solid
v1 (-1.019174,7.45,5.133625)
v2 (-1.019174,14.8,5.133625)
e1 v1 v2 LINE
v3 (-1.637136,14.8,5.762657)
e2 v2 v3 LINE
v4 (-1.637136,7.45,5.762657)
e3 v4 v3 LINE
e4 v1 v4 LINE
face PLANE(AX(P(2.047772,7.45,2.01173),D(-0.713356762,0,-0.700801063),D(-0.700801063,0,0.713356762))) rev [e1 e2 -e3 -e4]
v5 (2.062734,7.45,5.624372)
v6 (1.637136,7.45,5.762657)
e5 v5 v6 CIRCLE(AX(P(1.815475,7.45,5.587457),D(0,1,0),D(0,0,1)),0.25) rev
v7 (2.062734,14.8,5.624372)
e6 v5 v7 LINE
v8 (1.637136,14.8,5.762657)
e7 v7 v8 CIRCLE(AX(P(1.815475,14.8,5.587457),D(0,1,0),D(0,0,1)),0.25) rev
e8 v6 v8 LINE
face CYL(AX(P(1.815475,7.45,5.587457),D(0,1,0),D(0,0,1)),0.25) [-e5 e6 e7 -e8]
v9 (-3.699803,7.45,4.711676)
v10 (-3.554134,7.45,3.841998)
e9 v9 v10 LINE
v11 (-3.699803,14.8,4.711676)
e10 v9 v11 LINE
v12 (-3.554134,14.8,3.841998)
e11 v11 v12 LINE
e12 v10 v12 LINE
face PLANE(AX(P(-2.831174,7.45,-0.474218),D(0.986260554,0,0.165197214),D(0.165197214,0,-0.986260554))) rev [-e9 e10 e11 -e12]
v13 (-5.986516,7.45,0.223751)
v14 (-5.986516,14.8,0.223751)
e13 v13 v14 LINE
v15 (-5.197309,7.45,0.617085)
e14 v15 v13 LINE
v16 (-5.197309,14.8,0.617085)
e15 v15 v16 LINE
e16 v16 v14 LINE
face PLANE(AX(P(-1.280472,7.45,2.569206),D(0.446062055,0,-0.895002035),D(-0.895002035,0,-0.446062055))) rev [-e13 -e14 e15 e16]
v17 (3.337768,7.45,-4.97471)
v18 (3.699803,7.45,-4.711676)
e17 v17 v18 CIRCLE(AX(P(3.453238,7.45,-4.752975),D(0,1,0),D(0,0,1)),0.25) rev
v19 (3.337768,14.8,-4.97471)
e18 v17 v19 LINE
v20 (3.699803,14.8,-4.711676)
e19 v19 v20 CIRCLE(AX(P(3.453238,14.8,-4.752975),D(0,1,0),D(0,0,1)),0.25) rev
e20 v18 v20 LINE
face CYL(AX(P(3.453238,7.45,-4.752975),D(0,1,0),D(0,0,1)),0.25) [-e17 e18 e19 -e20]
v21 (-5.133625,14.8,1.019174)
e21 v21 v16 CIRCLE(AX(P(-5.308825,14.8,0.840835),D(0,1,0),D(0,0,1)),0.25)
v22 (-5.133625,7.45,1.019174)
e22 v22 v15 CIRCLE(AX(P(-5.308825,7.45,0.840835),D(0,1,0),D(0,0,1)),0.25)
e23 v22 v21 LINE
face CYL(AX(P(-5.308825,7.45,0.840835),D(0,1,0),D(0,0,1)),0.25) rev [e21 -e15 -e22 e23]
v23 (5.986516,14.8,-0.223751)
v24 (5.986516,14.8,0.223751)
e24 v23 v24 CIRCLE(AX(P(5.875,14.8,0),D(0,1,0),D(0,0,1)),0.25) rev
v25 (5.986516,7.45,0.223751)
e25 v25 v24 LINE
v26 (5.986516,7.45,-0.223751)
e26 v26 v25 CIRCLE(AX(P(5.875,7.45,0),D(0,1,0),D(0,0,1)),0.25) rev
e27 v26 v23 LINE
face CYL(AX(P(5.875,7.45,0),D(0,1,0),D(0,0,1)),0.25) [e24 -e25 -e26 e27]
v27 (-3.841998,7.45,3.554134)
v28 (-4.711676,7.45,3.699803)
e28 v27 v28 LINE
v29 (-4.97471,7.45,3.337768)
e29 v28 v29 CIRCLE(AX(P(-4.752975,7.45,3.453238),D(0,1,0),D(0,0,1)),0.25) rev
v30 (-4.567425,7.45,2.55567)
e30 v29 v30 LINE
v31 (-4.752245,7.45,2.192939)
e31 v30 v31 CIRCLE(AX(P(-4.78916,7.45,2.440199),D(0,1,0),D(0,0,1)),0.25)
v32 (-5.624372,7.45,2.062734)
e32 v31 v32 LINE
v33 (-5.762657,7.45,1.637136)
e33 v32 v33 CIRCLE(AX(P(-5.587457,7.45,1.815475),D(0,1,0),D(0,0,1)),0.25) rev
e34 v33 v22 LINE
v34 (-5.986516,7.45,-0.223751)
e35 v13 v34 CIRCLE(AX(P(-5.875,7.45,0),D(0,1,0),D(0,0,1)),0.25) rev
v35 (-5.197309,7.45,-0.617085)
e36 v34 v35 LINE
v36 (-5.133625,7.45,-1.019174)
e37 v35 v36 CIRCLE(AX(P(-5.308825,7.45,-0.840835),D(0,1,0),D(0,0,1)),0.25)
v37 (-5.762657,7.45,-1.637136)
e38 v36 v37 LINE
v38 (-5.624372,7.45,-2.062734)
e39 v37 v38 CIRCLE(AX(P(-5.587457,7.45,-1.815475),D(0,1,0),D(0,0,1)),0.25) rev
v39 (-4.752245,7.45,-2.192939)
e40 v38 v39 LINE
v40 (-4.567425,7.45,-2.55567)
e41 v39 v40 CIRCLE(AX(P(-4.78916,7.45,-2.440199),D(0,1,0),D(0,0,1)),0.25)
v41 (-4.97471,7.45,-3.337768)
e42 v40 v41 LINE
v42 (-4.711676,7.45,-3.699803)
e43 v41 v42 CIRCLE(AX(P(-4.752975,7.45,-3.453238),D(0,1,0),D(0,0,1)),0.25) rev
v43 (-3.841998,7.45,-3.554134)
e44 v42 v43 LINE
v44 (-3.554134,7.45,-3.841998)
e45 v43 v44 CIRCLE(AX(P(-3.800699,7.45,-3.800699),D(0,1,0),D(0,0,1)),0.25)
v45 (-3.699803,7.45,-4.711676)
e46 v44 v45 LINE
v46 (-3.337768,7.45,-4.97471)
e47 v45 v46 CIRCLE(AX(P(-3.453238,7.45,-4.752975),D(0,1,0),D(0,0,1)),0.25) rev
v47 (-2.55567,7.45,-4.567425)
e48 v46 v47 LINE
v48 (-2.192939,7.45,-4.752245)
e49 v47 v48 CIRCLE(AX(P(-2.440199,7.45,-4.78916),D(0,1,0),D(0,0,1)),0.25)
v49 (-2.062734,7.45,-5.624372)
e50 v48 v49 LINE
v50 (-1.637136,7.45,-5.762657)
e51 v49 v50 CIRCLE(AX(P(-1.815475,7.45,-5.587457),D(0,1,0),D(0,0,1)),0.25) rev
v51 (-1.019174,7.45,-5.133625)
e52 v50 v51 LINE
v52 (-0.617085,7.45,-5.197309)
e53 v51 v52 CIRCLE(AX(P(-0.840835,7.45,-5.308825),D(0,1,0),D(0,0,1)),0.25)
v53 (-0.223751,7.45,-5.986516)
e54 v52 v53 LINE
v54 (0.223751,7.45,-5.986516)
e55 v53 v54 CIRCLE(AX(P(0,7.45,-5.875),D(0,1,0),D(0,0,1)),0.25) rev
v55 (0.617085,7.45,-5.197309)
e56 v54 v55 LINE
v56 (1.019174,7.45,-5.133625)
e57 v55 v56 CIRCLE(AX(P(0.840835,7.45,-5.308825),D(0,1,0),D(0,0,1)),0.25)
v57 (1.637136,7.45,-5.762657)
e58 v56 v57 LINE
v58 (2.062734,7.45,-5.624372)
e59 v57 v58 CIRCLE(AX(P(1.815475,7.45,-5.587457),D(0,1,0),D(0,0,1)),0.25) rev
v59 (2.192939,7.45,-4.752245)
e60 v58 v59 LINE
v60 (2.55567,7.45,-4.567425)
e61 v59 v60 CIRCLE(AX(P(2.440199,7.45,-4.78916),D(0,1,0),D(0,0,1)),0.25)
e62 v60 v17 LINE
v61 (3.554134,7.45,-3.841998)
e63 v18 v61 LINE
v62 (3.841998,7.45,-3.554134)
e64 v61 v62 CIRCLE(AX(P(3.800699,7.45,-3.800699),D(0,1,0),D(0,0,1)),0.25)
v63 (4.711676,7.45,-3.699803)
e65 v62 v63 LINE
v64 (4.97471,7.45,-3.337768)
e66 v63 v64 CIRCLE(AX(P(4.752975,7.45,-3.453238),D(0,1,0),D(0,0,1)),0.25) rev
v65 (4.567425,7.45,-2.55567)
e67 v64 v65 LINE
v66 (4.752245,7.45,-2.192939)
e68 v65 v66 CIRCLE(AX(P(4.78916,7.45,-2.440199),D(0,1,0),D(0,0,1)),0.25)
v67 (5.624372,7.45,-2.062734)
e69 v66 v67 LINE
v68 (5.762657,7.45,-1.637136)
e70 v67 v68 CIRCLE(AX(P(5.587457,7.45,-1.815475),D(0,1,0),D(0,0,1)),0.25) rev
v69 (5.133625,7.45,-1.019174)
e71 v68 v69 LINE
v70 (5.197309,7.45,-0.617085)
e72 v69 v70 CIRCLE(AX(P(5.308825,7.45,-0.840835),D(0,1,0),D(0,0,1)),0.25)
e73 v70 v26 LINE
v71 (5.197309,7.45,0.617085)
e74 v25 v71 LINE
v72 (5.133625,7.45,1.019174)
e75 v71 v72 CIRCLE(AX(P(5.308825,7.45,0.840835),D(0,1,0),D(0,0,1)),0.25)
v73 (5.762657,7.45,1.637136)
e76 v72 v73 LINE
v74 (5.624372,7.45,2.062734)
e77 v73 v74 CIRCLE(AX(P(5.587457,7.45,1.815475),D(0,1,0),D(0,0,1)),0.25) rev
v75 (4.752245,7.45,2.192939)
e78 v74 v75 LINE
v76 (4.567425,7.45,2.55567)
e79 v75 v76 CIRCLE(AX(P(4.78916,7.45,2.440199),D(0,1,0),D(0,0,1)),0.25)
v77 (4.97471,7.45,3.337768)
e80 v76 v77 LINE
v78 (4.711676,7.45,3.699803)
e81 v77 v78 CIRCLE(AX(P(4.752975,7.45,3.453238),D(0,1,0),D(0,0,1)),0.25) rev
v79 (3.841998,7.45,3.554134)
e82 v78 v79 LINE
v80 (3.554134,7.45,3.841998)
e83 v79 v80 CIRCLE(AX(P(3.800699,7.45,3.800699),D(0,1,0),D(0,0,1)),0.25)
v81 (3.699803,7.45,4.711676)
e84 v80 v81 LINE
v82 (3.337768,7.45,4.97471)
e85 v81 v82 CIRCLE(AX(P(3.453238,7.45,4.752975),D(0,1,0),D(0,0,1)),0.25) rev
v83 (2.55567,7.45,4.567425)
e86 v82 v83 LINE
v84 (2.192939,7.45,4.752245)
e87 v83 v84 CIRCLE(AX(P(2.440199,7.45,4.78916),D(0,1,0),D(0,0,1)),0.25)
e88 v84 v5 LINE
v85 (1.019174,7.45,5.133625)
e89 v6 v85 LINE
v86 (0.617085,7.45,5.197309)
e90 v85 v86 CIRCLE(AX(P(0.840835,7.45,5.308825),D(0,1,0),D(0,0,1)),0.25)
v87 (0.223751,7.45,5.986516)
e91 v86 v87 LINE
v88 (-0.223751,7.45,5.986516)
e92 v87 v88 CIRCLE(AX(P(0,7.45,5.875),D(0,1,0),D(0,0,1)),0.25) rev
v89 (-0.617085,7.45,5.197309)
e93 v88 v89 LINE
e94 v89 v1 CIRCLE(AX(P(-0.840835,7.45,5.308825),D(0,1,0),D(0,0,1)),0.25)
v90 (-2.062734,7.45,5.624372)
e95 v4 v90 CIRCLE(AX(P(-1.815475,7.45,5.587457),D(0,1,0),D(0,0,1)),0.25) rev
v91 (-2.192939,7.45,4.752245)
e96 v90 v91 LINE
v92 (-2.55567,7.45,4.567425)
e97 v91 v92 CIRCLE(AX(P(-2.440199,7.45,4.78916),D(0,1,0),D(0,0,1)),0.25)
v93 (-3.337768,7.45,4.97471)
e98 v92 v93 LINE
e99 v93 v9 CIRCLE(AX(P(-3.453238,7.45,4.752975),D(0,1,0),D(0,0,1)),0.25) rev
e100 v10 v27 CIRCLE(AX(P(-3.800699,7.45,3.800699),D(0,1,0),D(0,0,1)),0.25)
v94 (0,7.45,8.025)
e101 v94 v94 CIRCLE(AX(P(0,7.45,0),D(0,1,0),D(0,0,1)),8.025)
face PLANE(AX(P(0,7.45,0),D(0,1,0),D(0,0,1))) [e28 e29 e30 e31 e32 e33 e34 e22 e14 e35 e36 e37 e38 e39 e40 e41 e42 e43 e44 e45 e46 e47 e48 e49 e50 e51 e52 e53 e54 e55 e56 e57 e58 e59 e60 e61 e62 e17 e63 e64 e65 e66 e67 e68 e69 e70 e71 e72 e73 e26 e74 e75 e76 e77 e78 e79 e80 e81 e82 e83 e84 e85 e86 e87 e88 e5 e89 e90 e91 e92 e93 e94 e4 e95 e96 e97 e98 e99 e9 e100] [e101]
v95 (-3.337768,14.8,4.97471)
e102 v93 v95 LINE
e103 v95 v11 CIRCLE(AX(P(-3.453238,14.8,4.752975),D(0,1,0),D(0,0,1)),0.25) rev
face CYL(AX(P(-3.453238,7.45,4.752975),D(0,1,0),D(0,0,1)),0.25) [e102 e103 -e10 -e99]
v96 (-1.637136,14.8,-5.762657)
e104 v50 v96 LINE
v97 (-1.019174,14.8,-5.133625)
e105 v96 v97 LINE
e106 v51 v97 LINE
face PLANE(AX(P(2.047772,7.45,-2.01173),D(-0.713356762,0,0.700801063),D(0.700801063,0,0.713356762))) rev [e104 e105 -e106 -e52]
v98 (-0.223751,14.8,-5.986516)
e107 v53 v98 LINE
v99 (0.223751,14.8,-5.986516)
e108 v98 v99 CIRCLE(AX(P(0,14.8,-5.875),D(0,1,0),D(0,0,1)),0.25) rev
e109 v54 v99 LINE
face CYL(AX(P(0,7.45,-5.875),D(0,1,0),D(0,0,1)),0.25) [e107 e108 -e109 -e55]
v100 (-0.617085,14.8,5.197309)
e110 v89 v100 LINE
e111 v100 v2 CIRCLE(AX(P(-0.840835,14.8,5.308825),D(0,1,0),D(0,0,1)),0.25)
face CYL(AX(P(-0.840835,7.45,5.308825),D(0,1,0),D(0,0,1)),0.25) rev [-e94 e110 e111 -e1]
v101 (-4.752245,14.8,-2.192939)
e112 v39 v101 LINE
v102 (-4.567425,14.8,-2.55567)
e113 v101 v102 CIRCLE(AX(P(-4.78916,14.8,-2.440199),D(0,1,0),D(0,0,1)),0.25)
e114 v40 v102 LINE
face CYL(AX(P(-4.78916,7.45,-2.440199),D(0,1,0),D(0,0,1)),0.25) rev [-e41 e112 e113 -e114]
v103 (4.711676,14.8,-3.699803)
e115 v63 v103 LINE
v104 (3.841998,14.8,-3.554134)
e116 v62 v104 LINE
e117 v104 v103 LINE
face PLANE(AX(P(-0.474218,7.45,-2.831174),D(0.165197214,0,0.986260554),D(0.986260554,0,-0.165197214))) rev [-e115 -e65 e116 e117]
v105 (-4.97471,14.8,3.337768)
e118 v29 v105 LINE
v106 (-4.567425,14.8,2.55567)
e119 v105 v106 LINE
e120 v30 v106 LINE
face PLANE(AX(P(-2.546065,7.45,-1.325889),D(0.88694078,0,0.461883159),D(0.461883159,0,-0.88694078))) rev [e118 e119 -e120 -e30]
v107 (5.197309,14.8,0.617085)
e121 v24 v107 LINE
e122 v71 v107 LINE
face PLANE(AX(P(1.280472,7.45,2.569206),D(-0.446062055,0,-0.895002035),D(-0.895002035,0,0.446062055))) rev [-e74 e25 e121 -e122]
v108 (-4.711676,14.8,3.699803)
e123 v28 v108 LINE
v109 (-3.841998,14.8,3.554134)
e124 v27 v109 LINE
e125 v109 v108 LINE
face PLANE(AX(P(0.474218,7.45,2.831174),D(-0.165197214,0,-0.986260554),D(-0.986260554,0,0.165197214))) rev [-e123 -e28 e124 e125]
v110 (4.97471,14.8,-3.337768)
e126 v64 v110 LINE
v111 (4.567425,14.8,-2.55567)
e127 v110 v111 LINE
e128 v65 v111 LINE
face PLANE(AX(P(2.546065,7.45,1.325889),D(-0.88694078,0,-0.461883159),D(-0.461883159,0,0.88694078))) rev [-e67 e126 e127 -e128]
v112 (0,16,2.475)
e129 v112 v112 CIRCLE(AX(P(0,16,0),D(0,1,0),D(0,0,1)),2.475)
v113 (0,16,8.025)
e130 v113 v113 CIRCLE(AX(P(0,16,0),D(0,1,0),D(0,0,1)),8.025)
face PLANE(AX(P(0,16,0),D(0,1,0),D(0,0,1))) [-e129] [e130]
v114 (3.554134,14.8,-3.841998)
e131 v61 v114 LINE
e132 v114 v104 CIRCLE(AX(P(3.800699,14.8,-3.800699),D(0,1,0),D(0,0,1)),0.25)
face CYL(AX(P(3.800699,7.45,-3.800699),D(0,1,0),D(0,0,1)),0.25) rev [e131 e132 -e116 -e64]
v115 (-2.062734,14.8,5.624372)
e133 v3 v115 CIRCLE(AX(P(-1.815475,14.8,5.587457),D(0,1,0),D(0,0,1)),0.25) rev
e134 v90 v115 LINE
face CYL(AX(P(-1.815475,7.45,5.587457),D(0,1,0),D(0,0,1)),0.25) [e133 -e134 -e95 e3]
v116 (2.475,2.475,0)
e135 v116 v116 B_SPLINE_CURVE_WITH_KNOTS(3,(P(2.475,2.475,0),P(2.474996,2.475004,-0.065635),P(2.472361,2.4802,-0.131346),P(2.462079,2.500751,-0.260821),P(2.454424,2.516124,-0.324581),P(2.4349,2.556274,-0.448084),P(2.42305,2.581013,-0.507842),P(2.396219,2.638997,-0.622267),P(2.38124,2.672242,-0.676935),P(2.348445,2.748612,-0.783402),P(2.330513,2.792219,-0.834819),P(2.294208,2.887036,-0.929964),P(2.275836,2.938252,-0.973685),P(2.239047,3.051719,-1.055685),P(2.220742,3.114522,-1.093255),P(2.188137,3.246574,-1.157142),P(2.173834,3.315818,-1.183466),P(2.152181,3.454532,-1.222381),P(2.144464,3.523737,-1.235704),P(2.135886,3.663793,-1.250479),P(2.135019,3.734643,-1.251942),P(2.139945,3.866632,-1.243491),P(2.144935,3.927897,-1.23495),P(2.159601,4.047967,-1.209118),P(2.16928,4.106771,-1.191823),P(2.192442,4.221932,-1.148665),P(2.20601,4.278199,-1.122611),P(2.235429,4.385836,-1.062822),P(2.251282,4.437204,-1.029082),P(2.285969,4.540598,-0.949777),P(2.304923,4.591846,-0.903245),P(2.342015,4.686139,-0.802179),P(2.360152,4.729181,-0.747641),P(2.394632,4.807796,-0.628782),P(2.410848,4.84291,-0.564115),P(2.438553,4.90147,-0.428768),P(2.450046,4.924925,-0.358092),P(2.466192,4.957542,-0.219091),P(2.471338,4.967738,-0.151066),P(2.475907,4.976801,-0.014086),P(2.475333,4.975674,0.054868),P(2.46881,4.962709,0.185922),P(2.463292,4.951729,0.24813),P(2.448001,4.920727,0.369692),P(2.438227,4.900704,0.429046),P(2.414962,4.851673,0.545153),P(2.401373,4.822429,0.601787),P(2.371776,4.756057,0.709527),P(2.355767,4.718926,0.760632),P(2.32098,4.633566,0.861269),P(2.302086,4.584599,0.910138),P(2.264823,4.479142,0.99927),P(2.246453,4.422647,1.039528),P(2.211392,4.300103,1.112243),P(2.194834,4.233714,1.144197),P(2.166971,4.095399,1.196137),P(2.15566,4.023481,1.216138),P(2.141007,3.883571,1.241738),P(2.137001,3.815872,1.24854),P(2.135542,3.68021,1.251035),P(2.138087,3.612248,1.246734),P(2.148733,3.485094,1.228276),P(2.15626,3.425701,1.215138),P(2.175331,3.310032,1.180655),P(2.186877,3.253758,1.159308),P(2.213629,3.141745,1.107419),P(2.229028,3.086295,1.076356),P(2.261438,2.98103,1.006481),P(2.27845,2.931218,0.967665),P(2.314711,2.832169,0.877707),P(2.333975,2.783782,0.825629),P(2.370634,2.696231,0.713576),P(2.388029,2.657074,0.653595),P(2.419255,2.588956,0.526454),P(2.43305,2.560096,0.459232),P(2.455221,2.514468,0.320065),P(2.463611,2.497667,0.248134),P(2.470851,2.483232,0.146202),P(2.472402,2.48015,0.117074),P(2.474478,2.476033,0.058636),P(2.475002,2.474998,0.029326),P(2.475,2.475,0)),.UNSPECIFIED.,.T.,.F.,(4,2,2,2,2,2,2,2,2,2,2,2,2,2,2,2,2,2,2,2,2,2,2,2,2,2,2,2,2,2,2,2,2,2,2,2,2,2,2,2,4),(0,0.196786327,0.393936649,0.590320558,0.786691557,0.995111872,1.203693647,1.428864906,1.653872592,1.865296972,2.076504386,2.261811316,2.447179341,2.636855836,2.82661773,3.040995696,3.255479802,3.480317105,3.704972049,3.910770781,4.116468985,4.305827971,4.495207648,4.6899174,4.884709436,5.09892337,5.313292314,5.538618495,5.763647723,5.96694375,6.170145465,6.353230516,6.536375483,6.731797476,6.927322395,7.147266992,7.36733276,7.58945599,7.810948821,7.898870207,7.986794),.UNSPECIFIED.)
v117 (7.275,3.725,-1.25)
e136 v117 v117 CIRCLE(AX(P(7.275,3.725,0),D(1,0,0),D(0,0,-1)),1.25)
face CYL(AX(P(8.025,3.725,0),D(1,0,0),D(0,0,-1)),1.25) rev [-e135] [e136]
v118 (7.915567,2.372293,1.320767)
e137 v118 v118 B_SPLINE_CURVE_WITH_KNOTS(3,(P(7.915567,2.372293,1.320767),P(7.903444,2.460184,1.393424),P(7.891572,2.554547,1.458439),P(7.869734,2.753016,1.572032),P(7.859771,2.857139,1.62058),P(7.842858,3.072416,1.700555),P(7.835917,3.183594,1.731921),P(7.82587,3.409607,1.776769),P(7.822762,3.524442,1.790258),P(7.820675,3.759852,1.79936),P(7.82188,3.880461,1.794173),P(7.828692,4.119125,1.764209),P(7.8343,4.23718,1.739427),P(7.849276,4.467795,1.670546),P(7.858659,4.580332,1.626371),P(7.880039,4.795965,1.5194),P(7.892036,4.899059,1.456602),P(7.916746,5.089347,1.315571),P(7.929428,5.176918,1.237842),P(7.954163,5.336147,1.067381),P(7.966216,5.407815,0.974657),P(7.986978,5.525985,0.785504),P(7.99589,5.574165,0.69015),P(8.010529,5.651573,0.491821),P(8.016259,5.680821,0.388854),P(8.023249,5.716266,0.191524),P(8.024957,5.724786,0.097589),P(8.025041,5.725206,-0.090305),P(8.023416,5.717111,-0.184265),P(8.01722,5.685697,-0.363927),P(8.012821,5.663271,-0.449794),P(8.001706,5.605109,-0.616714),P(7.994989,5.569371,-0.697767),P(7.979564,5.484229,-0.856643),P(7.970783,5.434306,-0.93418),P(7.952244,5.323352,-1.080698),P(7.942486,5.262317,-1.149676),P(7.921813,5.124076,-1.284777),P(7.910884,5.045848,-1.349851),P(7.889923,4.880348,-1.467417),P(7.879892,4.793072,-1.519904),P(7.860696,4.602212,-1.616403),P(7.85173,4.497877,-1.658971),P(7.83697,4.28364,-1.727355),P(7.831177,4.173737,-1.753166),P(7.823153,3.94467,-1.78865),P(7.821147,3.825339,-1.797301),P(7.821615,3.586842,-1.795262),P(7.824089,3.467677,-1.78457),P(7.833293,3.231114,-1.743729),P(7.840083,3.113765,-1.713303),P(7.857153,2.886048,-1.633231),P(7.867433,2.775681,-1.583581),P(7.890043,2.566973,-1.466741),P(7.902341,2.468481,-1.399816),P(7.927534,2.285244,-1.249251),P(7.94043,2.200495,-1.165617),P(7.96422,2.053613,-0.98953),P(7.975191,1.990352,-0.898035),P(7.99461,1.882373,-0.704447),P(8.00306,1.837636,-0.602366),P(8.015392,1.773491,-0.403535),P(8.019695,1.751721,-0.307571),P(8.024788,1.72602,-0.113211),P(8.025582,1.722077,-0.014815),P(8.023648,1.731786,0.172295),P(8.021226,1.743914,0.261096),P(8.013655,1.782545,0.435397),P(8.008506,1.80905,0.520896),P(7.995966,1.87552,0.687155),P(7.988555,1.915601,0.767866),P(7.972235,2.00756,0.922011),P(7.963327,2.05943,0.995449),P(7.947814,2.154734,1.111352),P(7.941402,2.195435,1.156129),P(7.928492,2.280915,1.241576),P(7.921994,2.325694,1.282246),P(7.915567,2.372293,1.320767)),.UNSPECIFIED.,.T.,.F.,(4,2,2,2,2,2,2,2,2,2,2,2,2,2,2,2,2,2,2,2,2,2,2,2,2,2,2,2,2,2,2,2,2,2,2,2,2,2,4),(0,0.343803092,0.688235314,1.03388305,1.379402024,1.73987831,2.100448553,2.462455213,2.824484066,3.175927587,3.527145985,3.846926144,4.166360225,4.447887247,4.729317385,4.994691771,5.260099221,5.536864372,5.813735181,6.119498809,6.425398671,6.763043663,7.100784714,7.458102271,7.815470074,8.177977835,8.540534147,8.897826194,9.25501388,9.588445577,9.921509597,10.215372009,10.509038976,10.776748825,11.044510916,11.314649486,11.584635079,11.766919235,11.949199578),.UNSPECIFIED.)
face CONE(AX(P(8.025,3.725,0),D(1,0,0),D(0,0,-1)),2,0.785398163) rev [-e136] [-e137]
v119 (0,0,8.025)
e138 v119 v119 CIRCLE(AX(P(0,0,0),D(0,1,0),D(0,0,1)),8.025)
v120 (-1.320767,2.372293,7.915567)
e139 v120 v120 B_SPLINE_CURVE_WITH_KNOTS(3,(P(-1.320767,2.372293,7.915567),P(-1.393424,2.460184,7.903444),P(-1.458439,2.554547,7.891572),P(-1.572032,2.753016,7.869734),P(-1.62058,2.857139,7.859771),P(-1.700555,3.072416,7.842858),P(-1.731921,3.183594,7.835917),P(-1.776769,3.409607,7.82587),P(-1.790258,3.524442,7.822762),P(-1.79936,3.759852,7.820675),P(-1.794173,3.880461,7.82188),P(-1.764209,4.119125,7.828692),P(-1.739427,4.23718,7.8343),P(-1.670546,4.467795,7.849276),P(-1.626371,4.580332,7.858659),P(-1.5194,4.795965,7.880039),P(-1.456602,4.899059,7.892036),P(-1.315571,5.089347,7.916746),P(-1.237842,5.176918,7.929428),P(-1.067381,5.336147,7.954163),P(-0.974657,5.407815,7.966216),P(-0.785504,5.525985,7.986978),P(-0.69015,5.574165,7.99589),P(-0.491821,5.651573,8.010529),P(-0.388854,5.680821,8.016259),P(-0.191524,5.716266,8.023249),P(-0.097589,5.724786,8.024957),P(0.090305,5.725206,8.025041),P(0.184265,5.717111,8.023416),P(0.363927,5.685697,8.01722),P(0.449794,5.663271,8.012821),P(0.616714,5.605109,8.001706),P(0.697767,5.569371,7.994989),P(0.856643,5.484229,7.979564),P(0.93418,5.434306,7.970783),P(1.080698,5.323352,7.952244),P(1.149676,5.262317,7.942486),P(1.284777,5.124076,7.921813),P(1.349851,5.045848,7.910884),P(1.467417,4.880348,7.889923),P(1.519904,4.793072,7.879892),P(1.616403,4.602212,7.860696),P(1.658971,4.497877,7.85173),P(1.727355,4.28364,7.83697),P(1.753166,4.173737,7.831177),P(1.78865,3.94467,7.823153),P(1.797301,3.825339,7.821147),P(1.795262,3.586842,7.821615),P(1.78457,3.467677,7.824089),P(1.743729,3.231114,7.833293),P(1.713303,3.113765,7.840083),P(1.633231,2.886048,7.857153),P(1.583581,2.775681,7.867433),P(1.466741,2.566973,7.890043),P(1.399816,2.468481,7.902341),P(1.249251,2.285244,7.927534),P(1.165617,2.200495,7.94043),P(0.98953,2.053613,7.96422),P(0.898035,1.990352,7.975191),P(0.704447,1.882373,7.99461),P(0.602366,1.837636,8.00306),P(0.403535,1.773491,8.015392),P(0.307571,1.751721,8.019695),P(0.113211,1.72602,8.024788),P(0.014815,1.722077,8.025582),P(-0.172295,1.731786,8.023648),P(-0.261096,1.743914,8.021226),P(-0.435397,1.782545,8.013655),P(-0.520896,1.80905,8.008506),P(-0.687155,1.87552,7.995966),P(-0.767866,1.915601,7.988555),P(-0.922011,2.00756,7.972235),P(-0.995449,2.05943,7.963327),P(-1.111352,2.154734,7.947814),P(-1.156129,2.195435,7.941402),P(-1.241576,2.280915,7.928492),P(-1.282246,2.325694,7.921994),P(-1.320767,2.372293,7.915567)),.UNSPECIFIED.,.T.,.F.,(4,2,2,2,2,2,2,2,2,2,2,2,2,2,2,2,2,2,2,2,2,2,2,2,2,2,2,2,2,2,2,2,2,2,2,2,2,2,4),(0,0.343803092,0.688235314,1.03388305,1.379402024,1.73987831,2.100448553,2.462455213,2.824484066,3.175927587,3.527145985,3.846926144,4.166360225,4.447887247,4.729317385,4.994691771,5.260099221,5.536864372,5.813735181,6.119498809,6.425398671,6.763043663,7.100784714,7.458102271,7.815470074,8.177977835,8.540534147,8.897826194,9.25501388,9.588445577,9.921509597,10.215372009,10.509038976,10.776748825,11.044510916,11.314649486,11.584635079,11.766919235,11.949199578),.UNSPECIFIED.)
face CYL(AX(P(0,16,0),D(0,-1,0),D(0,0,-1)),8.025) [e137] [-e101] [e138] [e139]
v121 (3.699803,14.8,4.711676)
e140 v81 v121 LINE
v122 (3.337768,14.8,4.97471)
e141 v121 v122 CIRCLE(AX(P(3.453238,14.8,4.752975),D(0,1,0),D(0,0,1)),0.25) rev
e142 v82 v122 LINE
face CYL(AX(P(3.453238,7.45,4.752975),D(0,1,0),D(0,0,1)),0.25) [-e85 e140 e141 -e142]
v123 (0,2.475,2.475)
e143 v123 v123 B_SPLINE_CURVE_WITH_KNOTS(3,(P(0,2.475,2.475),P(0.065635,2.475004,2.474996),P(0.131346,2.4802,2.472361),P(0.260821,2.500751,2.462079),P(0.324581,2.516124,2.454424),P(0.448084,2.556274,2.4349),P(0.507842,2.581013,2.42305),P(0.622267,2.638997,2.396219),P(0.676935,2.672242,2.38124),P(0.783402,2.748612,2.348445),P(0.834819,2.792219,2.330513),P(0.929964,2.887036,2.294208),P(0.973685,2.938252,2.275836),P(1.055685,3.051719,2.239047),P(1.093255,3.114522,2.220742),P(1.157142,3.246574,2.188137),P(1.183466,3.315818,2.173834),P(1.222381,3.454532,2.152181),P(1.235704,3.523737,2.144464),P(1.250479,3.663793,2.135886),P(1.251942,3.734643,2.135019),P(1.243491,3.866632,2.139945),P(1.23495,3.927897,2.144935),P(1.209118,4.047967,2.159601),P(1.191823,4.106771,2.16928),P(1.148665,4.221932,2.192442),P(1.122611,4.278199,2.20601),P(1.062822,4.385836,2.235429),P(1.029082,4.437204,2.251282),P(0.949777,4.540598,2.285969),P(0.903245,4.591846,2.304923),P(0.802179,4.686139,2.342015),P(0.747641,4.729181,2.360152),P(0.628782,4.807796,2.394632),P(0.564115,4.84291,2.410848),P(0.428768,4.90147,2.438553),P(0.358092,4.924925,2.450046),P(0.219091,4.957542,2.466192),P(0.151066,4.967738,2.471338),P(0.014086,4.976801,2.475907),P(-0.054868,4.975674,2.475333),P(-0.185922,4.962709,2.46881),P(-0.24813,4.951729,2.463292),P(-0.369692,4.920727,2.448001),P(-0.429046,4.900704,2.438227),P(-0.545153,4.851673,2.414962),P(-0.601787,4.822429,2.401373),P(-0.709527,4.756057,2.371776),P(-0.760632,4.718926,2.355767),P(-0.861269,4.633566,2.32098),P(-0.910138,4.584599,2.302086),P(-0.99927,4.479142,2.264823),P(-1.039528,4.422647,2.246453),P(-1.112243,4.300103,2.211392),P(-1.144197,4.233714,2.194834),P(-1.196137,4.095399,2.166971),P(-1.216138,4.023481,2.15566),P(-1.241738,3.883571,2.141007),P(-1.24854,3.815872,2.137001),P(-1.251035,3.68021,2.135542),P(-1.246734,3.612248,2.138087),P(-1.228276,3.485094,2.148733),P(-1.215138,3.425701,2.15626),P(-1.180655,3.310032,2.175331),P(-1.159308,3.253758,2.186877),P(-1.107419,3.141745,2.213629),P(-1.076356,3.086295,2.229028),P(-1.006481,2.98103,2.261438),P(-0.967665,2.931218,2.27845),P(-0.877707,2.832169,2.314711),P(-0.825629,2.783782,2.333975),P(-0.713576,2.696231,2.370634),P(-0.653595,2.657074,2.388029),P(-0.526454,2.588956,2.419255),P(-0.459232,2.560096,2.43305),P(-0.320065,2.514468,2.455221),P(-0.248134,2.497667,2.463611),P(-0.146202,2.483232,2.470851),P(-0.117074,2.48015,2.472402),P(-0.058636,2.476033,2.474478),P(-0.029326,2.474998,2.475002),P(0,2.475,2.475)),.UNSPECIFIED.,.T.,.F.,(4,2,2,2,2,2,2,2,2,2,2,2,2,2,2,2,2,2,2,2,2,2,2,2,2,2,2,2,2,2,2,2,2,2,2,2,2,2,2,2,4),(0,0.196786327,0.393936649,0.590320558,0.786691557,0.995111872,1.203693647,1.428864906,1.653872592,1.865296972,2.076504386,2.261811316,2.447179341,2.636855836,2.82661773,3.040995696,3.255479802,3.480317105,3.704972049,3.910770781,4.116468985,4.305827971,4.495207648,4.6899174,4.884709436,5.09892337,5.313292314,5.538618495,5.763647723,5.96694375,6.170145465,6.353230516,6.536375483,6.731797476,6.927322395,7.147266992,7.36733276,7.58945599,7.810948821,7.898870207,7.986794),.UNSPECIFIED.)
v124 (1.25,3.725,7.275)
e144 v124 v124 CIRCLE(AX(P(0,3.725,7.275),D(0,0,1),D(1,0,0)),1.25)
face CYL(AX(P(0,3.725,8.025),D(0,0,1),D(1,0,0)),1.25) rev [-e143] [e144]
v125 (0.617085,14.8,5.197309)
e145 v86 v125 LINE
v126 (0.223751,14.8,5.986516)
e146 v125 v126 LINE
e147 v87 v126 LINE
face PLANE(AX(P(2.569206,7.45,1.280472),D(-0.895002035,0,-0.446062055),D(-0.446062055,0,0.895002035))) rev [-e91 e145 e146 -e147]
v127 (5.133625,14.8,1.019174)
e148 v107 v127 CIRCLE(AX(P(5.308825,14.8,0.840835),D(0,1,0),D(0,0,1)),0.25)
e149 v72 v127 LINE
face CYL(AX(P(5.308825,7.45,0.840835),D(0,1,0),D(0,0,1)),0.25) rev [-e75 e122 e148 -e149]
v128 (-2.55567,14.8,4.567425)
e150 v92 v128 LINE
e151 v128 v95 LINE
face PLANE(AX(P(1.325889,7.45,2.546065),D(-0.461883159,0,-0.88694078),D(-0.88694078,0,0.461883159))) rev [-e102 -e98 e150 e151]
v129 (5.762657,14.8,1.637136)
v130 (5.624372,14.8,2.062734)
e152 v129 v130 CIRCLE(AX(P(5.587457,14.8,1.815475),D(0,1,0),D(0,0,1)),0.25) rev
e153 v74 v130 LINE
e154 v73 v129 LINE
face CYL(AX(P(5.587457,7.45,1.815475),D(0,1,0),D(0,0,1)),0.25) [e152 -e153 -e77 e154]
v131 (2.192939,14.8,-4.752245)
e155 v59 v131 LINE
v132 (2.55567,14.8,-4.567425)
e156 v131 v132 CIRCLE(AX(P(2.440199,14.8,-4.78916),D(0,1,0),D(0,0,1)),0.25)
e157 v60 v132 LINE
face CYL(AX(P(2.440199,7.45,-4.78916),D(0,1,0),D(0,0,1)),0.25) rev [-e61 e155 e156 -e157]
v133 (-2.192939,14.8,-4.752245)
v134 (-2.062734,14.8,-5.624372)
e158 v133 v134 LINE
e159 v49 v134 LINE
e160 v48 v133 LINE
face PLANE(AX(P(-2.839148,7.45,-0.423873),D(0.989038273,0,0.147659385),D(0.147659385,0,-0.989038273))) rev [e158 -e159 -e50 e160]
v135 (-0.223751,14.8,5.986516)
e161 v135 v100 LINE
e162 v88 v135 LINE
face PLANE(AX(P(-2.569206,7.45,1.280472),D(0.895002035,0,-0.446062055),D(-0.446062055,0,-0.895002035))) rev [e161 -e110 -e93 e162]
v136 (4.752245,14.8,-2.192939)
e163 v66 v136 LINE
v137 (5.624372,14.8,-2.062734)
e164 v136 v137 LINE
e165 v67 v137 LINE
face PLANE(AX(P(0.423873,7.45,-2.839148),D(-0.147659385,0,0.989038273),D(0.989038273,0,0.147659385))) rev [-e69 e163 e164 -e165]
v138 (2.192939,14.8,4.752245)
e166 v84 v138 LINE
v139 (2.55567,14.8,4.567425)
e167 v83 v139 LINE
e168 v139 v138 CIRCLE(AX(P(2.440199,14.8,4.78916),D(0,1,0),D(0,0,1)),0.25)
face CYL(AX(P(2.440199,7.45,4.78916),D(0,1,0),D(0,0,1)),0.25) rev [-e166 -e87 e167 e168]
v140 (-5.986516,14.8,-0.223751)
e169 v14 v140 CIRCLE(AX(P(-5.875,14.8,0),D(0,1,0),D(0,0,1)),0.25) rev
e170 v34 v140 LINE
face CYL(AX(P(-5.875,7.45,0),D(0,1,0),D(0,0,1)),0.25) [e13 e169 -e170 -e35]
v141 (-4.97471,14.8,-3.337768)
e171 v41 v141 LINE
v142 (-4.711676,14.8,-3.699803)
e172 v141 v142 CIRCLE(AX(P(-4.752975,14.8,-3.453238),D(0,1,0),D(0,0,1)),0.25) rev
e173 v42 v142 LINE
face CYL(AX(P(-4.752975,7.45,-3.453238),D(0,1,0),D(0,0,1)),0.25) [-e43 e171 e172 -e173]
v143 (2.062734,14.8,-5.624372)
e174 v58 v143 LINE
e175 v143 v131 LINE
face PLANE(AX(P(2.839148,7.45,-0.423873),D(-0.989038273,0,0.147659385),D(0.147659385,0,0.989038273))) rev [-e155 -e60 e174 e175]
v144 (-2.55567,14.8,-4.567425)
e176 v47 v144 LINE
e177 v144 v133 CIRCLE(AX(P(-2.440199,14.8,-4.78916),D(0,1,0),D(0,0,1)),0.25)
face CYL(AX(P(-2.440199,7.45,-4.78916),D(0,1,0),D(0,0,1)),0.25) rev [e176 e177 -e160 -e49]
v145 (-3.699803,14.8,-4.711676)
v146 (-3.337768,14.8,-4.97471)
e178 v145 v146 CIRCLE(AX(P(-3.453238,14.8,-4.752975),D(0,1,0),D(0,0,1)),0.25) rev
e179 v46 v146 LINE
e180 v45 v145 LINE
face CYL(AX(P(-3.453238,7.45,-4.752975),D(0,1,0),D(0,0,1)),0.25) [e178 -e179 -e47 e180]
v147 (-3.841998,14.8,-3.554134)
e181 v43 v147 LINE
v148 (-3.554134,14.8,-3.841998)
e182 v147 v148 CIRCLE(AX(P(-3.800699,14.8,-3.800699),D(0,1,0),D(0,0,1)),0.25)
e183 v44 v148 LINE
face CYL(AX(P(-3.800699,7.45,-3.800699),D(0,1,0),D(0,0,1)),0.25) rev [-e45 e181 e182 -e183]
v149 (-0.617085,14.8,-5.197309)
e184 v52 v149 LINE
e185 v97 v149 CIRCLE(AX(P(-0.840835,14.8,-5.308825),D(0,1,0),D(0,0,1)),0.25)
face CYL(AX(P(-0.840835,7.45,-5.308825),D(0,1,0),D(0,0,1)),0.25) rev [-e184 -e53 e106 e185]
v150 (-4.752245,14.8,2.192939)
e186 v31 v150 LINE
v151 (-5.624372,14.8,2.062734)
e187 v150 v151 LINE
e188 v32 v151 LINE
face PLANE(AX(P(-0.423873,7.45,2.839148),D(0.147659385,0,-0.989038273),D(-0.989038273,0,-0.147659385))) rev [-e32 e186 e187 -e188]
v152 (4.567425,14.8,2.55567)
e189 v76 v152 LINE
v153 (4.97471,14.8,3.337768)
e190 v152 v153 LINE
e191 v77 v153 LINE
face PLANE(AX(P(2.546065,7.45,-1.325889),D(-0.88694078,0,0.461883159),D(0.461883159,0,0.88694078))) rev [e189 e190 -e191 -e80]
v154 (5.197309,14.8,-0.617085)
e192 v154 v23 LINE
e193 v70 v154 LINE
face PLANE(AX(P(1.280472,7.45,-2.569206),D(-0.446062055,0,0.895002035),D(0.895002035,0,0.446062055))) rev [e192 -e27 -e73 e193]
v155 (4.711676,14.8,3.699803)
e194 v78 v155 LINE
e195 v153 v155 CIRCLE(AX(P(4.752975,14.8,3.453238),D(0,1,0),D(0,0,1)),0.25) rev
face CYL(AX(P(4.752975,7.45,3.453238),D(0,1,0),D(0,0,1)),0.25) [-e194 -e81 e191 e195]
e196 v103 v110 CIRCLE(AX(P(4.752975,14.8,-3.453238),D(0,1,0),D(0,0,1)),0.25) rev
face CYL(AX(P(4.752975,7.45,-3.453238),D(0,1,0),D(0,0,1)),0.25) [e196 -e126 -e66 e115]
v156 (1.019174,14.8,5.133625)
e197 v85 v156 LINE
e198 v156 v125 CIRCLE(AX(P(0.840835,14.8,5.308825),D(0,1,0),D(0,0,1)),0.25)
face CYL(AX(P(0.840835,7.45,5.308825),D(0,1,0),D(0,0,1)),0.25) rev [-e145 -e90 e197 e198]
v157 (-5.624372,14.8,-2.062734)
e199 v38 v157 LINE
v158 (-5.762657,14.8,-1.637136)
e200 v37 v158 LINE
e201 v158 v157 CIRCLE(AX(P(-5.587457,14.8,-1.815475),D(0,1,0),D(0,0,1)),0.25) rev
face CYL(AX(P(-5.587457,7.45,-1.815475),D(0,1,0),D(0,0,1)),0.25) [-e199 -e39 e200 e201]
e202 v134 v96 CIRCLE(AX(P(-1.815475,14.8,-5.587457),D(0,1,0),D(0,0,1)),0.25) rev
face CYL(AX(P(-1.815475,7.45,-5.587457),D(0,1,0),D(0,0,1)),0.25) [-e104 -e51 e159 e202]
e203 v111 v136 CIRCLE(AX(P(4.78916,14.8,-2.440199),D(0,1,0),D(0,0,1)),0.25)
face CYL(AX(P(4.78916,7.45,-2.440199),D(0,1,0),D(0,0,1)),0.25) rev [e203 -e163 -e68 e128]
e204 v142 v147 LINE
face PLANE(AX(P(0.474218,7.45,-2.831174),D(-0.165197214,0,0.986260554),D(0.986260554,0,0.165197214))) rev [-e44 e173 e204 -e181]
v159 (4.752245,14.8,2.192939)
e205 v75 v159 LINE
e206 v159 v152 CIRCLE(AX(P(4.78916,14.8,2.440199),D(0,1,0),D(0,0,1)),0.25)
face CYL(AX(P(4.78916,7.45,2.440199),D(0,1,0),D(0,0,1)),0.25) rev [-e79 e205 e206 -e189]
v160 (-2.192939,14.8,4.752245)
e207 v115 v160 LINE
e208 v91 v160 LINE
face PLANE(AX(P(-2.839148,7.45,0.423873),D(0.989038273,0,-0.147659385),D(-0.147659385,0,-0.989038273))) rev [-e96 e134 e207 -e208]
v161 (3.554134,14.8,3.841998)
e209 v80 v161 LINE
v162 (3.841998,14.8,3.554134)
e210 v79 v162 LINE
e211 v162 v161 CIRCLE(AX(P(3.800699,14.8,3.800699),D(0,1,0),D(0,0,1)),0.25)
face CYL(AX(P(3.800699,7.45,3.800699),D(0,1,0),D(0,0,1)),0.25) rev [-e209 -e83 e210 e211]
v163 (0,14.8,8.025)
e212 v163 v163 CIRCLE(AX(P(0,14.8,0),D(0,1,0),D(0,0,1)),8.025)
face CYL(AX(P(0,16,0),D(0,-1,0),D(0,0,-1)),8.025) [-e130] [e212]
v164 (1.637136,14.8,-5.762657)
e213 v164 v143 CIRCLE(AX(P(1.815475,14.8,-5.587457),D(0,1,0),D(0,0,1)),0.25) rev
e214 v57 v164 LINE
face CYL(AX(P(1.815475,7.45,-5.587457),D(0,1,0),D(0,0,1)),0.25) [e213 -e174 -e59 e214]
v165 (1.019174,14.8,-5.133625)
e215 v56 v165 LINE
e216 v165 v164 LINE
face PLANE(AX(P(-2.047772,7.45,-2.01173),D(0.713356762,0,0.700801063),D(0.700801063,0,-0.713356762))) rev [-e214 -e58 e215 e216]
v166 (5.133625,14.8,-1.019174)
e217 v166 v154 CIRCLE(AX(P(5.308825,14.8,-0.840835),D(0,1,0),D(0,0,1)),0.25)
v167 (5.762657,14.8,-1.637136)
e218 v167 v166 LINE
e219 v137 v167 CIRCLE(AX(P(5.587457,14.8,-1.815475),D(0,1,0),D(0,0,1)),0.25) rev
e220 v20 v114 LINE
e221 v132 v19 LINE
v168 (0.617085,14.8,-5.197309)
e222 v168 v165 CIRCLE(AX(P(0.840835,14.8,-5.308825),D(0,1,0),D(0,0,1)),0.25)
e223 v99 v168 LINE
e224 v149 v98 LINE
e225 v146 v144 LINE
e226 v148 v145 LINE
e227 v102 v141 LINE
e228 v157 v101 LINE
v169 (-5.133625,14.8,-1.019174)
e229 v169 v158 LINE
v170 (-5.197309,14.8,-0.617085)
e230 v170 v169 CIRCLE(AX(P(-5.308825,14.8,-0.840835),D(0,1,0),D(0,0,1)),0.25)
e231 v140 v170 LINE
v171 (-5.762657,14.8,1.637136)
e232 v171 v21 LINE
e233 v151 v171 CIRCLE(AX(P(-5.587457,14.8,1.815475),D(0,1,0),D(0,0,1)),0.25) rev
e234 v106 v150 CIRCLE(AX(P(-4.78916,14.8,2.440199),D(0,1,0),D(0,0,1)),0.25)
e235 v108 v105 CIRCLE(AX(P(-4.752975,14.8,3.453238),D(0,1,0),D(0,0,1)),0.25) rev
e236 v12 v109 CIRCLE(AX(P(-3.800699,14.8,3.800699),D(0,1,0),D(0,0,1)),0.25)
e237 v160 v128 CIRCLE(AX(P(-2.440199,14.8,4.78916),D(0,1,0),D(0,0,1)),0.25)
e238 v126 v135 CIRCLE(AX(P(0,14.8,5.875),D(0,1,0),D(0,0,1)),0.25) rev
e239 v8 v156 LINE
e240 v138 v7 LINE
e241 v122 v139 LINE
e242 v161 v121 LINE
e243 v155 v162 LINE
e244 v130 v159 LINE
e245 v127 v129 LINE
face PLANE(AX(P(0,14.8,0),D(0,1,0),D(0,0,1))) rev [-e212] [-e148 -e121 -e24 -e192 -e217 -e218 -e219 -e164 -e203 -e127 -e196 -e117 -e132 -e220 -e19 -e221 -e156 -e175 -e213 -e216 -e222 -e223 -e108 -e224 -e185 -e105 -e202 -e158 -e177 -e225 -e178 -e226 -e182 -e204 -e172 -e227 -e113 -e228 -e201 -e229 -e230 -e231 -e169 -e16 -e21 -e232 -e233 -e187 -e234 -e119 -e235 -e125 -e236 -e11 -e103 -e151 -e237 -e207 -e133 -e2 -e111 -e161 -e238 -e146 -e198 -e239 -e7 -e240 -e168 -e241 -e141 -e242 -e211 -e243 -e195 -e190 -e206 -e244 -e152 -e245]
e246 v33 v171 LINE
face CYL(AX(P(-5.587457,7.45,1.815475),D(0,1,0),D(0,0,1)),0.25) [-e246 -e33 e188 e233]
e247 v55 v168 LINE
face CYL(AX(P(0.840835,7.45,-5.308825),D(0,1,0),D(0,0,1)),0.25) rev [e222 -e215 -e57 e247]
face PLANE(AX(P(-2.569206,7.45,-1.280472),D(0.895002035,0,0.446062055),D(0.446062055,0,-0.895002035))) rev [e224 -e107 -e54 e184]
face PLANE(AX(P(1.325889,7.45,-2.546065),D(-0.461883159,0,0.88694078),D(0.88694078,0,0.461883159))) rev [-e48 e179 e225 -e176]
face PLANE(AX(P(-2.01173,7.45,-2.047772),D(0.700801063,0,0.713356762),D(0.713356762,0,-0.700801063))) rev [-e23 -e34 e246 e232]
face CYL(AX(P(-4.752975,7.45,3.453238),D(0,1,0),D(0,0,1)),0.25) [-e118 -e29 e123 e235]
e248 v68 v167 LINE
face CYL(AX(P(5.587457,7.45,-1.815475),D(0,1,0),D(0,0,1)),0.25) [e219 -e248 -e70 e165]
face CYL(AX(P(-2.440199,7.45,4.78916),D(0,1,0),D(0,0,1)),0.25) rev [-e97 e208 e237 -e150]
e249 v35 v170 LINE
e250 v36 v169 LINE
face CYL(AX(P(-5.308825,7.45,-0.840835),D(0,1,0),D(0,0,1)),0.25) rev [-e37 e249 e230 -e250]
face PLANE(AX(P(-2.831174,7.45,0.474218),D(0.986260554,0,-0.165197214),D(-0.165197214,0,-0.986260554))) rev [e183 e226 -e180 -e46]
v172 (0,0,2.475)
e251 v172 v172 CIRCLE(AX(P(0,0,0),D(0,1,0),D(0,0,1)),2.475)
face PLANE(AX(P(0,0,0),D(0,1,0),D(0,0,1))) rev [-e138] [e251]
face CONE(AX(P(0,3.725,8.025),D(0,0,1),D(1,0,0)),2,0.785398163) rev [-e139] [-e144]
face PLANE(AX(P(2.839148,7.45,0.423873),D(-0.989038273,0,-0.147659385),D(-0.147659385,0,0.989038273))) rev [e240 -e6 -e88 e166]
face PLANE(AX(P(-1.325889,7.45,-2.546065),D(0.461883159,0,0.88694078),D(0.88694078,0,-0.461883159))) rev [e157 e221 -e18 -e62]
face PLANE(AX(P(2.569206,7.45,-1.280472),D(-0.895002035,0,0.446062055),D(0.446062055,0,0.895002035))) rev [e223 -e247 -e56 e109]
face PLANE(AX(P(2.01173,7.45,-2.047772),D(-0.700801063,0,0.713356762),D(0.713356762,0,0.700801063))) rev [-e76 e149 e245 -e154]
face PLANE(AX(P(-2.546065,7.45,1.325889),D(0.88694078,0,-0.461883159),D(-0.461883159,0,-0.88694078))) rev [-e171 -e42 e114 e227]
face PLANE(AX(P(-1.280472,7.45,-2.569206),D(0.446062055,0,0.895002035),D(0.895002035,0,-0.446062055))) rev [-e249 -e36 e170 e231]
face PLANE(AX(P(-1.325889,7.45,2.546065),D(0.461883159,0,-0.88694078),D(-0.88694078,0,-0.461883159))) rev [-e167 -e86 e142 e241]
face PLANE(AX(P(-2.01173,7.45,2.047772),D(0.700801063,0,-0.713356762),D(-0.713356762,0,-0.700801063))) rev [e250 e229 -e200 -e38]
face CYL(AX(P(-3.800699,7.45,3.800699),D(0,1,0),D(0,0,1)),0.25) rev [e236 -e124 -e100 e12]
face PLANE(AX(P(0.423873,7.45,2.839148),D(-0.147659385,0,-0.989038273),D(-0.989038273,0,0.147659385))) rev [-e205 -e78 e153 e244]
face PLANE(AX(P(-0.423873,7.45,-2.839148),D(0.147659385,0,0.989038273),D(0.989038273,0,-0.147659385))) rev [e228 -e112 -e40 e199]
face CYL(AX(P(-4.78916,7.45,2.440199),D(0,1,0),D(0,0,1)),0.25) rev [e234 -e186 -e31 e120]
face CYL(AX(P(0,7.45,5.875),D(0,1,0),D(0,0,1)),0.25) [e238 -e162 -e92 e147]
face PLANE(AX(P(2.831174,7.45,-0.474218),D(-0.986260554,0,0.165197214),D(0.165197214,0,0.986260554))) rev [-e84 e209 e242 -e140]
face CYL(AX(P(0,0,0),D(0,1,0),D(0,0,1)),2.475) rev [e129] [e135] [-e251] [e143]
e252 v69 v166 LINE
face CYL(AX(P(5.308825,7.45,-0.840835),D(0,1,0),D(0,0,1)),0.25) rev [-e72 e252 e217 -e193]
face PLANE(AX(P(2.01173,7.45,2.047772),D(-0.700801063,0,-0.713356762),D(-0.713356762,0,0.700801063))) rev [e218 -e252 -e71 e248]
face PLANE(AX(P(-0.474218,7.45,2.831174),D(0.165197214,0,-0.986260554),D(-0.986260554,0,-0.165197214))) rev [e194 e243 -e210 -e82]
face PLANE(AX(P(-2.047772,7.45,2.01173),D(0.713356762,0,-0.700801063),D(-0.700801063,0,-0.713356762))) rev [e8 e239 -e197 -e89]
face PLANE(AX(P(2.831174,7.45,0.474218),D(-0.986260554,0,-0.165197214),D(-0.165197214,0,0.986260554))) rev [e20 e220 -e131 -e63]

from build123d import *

# Parameters (mm, degrees)
SKETCH1_R           = 8.025
BOSS_EXTRUDE1_DEPTH = 16
CUT_EXTRUDE1_START  = -8.55
SKETCH2_R           = 8.025
CUT_EXTRUDE1_DEPTH  = 7.35
SKETCH3_R           = 2.475
CUT_EXTRUDE2_DEPTH  = 20.616351598
CIRPATTERN1_COUNT   = 2
CIRPATTERN1_ANGLE   = 90


# Read off the part's stored shape, not the designer's step: M3x0.5 Tapped Hole1
with BuildPart() as part:
    # Sketch1 → Boss-Extrude1 (new body)
    with BuildSketch(Plane(origin=(0, 0, 0), x_dir=(1, 0, 0), z_dir=(0, 1, 0))):
        with Locations(Location((0, 0, 0), (0, 0, 270))):
            Circle(SKETCH1_R)
    extrude(amount=BOSS_EXTRUDE1_DEPTH)

    # Sketch2 → Cut-Extrude1 (cut)
    with BuildSketch(Plane(origin=(0, 16, 0), x_dir=(1, 0, 0), z_dir=(0, 1, 0)).offset(CUT_EXTRUDE1_START)):
        with Locations(Location((0, 0, 0), (0, 0, 270))):
            Circle(SKETCH2_R)
        with BuildLine():
            Line((0.223750509, 5.986515514), (0.617084741, 5.197309317))
            ThreePointArc((0.617084741, 5.197309317), (0.801726633, 5.061902746), (1.01917444, 5.133624565))
            Line((1.01917444, 5.133624565), (1.637135651, 5.762657299))
            ThreePointArc((1.637135651, 5.762657299), (1.756034951, 5.830288043), (1.892729091, 5.825221162))
            ThreePointArc((1.892729091, 5.825221162), (2.00629521, 5.748973556), (2.06273441, 5.62437188))
            Line((2.06273441, 5.62437188), (2.192939368, 4.752245221))
            ThreePointArc((2.192939368, 4.752245221), (2.326701311, 4.566408436), (2.555669726, 4.567424872))
            Line((2.555669726, 4.567424872), (3.337767568, 4.974710037))
            ThreePointArc((3.337767568, 4.974710037), (3.471746571, 5.002288793), (3.60018467, 4.955229091))
            ThreePointArc((3.60018467, 4.955229091), (3.684630662, 4.847619447), (3.699803496, 4.711675538))
            Line((3.699803496, 4.711675538), (3.55413381, 3.841998252))
            ThreePointArc((3.55413381, 3.841998252), (3.623922254, 3.623922254), (3.841998252, 3.55413381))
            Line((3.841998252, 3.55413381), (4.711675538, 3.699803496))
            ThreePointArc((4.711675538, 3.699803496), (4.847619447, 3.684630662), (4.955229091, 3.60018467))
            ThreePointArc((4.955229091, 3.60018467), (5.002288793, 3.471746571), (4.974710037, 3.337767568))
            Line((4.974710037, 3.337767568), (4.567424872, 2.555669726))
            ThreePointArc((4.567424872, 2.555669726), (4.566408436, 2.326701311), (4.752245221, 2.192939368))
            Line((4.752245221, 2.192939368), (5.62437188, 2.06273441))
            ThreePointArc((5.62437188, 2.06273441), (5.748973556, 2.00629521), (5.825221162, 1.892729091))
            ThreePointArc((5.825221162, 1.892729091), (5.830288043, 1.756034951), (5.762657299, 1.637135651))
            Line((5.762657299, 1.637135651), (5.133624565, 1.01917444))
            ThreePointArc((5.133624565, 1.01917444), (5.061902746, 0.801726633), (5.197309317, 0.617084741))
            Line((5.197309317, 0.617084741), (5.986515514, 0.223750509))
            ThreePointArc((5.986515514, 0.223750509), (6.087578078, 0.131569604), (6.125, 0))
            ThreePointArc((6.125, 0), (6.087578078, -0.131569604), (5.986515514, -0.223750509))
            Line((5.986515514, -0.223750509), (5.197309317, -0.617084741))
            ThreePointArc((5.197309317, -0.617084741), (5.061902746, -0.801726633), (5.133624565, -1.01917444))
            Line((5.133624565, -1.01917444), (5.762657299, -1.637135651))
            ThreePointArc((5.762657299, -1.637135651), (5.830288043, -1.756034951), (5.825221162, -1.892729091))
            ThreePointArc((5.825221162, -1.892729091), (5.748973556, -2.00629521), (5.62437188, -2.06273441))
            Line((5.62437188, -2.06273441), (4.752245221, -2.192939368))
            ThreePointArc((4.752245221, -2.192939368), (4.566408436, -2.326701311), (4.567424872, -2.555669726))
            Line((4.567424872, -2.555669726), (4.974710037, -3.337767568))
            ThreePointArc((4.974710037, -3.337767568), (5.002288793, -3.471746571), (4.955229091, -3.60018467))
            ThreePointArc((4.955229091, -3.60018467), (4.847619447, -3.684630662), (4.711675538, -3.699803496))
            Line((4.711675538, -3.699803496), (3.841998252, -3.55413381))
            ThreePointArc((3.841998252, -3.55413381), (3.623922254, -3.623922254), (3.55413381, -3.841998252))
            Line((3.55413381, -3.841998252), (3.699803496, -4.711675538))
            ThreePointArc((3.699803496, -4.711675538), (3.684630662, -4.847619447), (3.60018467, -4.955229091))
            ThreePointArc((3.60018467, -4.955229091), (3.471746571, -5.002288793), (3.337767568, -4.974710037))
            Line((3.337767568, -4.974710037), (2.555669726, -4.567424872))
            ThreePointArc((2.555669726, -4.567424872), (2.326701311, -4.566408436), (2.192939368, -4.752245221))
            Line((2.192939368, -4.752245221), (2.06273441, -5.62437188))
            ThreePointArc((2.06273441, -5.62437188), (2.00629521, -5.748973556), (1.892729091, -5.825221162))
            ThreePointArc((1.892729091, -5.825221162), (1.756034951, -5.830288043), (1.637135651, -5.762657299))
            Line((1.637135651, -5.762657299), (1.01917444, -5.133624565))
            ThreePointArc((1.01917444, -5.133624565), (0.801726633, -5.061902746), (0.617084741, -5.197309317))
            Line((0.617084741, -5.197309317), (0.223750509, -5.986515514))
            ThreePointArc((0.223750509, -5.986515514), (0.131569604, -6.087578078), (0, -6.125))
            ThreePointArc((0, -6.125), (-0.131569604, -6.087578078), (-0.223750509, -5.986515514))
            Line((-0.223750509, -5.986515514), (-0.617084741, -5.197309317))
            ThreePointArc((-0.617084741, -5.197309317), (-0.801726633, -5.061902746), (-1.01917444, -5.133624565))
            Line((-1.01917444, -5.133624565), (-1.637135651, -5.762657299))
            ThreePointArc((-1.637135651, -5.762657299), (-1.756034951, -5.830288043), (-1.892729091, -5.825221162))
            ThreePointArc((-1.892729091, -5.825221162), (-2.00629521, -5.748973556), (-2.06273441, -5.62437188))
            Line((-2.06273441, -5.62437188), (-2.192939368, -4.752245221))
            ThreePointArc((-2.192939368, -4.752245221), (-2.326701311, -4.566408436), (-2.555669726, -4.567424872))
            Line((-2.555669726, -4.567424872), (-3.337767568, -4.974710037))
            ThreePointArc((-3.337767568, -4.974710037), (-3.471746571, -5.002288793), (-3.60018467, -4.955229091))
            ThreePointArc((-3.60018467, -4.955229091), (-3.684630662, -4.847619447), (-3.699803496, -4.711675538))
            Line((-3.699803496, -4.711675538), (-3.55413381, -3.841998252))
            ThreePointArc((-3.55413381, -3.841998252), (-3.623922254, -3.623922254), (-3.841998252, -3.55413381))
            Line((-3.841998252, -3.55413381), (-4.711675538, -3.699803496))
            ThreePointArc((-4.711675538, -3.699803496), (-4.847619447, -3.684630662), (-4.955229091, -3.60018467))
            ThreePointArc((-4.955229091, -3.60018467), (-5.002288793, -3.471746571), (-4.974710037, -3.337767568))
            Line((-4.974710037, -3.337767568), (-4.567424872, -2.555669726))
            ThreePointArc((-4.567424872, -2.555669726), (-4.566408436, -2.326701311), (-4.752245221, -2.192939368))
            Line((-4.752245221, -2.192939368), (-5.62437188, -2.06273441))
            ThreePointArc((-5.62437188, -2.06273441), (-5.748973556, -2.00629521), (-5.825221162, -1.892729091))
            ThreePointArc((-5.825221162, -1.892729091), (-5.830288043, -1.756034951), (-5.762657299, -1.637135651))
            Line((-5.762657299, -1.637135651), (-5.133624565, -1.01917444))
            ThreePointArc((-5.133624565, -1.01917444), (-5.061902746, -0.801726633), (-5.197309317, -0.617084741))
            Line((-5.197309317, -0.617084741), (-5.986515514, -0.223750509))
            ThreePointArc((-5.986515514, -0.223750509), (-6.087578078, -0.131569604), (-6.125, 0))
            ThreePointArc((-6.125, 0), (-6.087578078, 0.131569604), (-5.986515514, 0.223750509))
            Line((-5.986515514, 0.223750509), (-5.197309317, 0.617084741))
            ThreePointArc((-5.197309317, 0.617084741), (-5.061902746, 0.801726633), (-5.133624565, 1.01917444))
            Line((-5.133624565, 1.01917444), (-5.762657299, 1.637135651))
            ThreePointArc((-5.762657299, 1.637135651), (-5.830288043, 1.756034951), (-5.825221162, 1.892729091))
            ThreePointArc((-5.825221162, 1.892729091), (-5.748973556, 2.00629521), (-5.62437188, 2.06273441))
            Line((-5.62437188, 2.06273441), (-4.752245221, 2.192939368))
            ThreePointArc((-4.752245221, 2.192939368), (-4.566408436, 2.326701311), (-4.567424872, 2.555669726))
            Line((-4.567424872, 2.555669726), (-4.974710037, 3.337767568))
            ThreePointArc((-4.974710037, 3.337767568), (-5.002288793, 3.471746571), (-4.955229091, 3.60018467))
            ThreePointArc((-4.955229091, 3.60018467), (-4.847619447, 3.684630662), (-4.711675538, 3.699803496))
            Line((-4.711675538, 3.699803496), (-3.841998252, 3.55413381))
            ThreePointArc((-3.841998252, 3.55413381), (-3.623922254, 3.623922254), (-3.55413381, 3.841998252))
            Line((-3.55413381, 3.841998252), (-3.699803496, 4.711675538))
            ThreePointArc((-3.699803496, 4.711675538), (-3.684630662, 4.847619447), (-3.60018467, 4.955229091))
            ThreePointArc((-3.60018467, 4.955229091), (-3.471746571, 5.002288793), (-3.337767568, 4.974710037))
            Line((-3.337767568, 4.974710037), (-2.555669726, 4.567424872))
            ThreePointArc((-2.555669726, 4.567424872), (-2.326701311, 4.566408436), (-2.192939368, 4.752245221))
            Line((-2.192939368, 4.752245221), (-2.06273441, 5.62437188))
            ThreePointArc((-2.06273441, 5.62437188), (-2.00629521, 5.748973556), (-1.892729091, 5.825221162))
            ThreePointArc((-1.892729091, 5.825221162), (-1.756034951, 5.830288043), (-1.637135651, 5.762657299))
            Line((-1.637135651, 5.762657299), (-1.01917444, 5.133624565))
            ThreePointArc((-1.01917444, 5.133624565), (-0.801726633, 5.061902746), (-0.617084741, 5.197309317))
            Line((-0.617084741, 5.197309317), (-0.223750509, 5.986515514))
            ThreePointArc((-0.223750509, 5.986515514), (-0.131569604, 6.087578078), (0, 6.125))
            ThreePointArc((0, 6.125), (0.131569604, 6.087578078), (0.223750509, 5.986515514))
        make_face(mode=Mode.SUBTRACT)
    extrude(amount=CUT_EXTRUDE1_DEPTH, mode=Mode.SUBTRACT)

    # Sketch3 → Cut-Extrude2 (cut, through all)
    with BuildSketch(Plane(origin=(0, 16, 0), x_dir=(1, 0, 0), z_dir=(0, 1, 0))):
        with Locations(Location((0, 0, 0), (0, 0, 270))):
            Circle(SKETCH3_R)
    extrude(amount=-CUT_EXTRUDE2_DEPTH, mode=Mode.SUBTRACT)

    # M3x0.5 Tapped Hole1 outline → M3x0.5 Tapped Hole1 (revolve, cut)
    with BuildSketch(Plane.XZ.offset(-3.725)):
        Polygon((2.000000319, 8.025000319), (0, 8.025000319), (0, 2.135986764), (1.25, 2.135986764), (1.25, 7.275), align=None)
    m3x0_5_tapped_hole1 = revolve(axis=Axis((0, 3.725, 0), (0, 0, 1)), mode=Mode.SUBTRACT)

    # CirPattern1: M3x0.5 Tapped Hole1 ×2 about axis
    cirpattern1_axis = Axis((0, 16, 0), (0, 1, 0))
    for i in range(1, CIRPATTERN1_COUNT):
        add(m3x0_5_tapped_hole1.rotate(cirpattern1_axis, i * CIRPATTERN1_ANGLE / (CIRPATTERN1_COUNT - 1)), mode=Mode.SUBTRACT)


solid = part.part
